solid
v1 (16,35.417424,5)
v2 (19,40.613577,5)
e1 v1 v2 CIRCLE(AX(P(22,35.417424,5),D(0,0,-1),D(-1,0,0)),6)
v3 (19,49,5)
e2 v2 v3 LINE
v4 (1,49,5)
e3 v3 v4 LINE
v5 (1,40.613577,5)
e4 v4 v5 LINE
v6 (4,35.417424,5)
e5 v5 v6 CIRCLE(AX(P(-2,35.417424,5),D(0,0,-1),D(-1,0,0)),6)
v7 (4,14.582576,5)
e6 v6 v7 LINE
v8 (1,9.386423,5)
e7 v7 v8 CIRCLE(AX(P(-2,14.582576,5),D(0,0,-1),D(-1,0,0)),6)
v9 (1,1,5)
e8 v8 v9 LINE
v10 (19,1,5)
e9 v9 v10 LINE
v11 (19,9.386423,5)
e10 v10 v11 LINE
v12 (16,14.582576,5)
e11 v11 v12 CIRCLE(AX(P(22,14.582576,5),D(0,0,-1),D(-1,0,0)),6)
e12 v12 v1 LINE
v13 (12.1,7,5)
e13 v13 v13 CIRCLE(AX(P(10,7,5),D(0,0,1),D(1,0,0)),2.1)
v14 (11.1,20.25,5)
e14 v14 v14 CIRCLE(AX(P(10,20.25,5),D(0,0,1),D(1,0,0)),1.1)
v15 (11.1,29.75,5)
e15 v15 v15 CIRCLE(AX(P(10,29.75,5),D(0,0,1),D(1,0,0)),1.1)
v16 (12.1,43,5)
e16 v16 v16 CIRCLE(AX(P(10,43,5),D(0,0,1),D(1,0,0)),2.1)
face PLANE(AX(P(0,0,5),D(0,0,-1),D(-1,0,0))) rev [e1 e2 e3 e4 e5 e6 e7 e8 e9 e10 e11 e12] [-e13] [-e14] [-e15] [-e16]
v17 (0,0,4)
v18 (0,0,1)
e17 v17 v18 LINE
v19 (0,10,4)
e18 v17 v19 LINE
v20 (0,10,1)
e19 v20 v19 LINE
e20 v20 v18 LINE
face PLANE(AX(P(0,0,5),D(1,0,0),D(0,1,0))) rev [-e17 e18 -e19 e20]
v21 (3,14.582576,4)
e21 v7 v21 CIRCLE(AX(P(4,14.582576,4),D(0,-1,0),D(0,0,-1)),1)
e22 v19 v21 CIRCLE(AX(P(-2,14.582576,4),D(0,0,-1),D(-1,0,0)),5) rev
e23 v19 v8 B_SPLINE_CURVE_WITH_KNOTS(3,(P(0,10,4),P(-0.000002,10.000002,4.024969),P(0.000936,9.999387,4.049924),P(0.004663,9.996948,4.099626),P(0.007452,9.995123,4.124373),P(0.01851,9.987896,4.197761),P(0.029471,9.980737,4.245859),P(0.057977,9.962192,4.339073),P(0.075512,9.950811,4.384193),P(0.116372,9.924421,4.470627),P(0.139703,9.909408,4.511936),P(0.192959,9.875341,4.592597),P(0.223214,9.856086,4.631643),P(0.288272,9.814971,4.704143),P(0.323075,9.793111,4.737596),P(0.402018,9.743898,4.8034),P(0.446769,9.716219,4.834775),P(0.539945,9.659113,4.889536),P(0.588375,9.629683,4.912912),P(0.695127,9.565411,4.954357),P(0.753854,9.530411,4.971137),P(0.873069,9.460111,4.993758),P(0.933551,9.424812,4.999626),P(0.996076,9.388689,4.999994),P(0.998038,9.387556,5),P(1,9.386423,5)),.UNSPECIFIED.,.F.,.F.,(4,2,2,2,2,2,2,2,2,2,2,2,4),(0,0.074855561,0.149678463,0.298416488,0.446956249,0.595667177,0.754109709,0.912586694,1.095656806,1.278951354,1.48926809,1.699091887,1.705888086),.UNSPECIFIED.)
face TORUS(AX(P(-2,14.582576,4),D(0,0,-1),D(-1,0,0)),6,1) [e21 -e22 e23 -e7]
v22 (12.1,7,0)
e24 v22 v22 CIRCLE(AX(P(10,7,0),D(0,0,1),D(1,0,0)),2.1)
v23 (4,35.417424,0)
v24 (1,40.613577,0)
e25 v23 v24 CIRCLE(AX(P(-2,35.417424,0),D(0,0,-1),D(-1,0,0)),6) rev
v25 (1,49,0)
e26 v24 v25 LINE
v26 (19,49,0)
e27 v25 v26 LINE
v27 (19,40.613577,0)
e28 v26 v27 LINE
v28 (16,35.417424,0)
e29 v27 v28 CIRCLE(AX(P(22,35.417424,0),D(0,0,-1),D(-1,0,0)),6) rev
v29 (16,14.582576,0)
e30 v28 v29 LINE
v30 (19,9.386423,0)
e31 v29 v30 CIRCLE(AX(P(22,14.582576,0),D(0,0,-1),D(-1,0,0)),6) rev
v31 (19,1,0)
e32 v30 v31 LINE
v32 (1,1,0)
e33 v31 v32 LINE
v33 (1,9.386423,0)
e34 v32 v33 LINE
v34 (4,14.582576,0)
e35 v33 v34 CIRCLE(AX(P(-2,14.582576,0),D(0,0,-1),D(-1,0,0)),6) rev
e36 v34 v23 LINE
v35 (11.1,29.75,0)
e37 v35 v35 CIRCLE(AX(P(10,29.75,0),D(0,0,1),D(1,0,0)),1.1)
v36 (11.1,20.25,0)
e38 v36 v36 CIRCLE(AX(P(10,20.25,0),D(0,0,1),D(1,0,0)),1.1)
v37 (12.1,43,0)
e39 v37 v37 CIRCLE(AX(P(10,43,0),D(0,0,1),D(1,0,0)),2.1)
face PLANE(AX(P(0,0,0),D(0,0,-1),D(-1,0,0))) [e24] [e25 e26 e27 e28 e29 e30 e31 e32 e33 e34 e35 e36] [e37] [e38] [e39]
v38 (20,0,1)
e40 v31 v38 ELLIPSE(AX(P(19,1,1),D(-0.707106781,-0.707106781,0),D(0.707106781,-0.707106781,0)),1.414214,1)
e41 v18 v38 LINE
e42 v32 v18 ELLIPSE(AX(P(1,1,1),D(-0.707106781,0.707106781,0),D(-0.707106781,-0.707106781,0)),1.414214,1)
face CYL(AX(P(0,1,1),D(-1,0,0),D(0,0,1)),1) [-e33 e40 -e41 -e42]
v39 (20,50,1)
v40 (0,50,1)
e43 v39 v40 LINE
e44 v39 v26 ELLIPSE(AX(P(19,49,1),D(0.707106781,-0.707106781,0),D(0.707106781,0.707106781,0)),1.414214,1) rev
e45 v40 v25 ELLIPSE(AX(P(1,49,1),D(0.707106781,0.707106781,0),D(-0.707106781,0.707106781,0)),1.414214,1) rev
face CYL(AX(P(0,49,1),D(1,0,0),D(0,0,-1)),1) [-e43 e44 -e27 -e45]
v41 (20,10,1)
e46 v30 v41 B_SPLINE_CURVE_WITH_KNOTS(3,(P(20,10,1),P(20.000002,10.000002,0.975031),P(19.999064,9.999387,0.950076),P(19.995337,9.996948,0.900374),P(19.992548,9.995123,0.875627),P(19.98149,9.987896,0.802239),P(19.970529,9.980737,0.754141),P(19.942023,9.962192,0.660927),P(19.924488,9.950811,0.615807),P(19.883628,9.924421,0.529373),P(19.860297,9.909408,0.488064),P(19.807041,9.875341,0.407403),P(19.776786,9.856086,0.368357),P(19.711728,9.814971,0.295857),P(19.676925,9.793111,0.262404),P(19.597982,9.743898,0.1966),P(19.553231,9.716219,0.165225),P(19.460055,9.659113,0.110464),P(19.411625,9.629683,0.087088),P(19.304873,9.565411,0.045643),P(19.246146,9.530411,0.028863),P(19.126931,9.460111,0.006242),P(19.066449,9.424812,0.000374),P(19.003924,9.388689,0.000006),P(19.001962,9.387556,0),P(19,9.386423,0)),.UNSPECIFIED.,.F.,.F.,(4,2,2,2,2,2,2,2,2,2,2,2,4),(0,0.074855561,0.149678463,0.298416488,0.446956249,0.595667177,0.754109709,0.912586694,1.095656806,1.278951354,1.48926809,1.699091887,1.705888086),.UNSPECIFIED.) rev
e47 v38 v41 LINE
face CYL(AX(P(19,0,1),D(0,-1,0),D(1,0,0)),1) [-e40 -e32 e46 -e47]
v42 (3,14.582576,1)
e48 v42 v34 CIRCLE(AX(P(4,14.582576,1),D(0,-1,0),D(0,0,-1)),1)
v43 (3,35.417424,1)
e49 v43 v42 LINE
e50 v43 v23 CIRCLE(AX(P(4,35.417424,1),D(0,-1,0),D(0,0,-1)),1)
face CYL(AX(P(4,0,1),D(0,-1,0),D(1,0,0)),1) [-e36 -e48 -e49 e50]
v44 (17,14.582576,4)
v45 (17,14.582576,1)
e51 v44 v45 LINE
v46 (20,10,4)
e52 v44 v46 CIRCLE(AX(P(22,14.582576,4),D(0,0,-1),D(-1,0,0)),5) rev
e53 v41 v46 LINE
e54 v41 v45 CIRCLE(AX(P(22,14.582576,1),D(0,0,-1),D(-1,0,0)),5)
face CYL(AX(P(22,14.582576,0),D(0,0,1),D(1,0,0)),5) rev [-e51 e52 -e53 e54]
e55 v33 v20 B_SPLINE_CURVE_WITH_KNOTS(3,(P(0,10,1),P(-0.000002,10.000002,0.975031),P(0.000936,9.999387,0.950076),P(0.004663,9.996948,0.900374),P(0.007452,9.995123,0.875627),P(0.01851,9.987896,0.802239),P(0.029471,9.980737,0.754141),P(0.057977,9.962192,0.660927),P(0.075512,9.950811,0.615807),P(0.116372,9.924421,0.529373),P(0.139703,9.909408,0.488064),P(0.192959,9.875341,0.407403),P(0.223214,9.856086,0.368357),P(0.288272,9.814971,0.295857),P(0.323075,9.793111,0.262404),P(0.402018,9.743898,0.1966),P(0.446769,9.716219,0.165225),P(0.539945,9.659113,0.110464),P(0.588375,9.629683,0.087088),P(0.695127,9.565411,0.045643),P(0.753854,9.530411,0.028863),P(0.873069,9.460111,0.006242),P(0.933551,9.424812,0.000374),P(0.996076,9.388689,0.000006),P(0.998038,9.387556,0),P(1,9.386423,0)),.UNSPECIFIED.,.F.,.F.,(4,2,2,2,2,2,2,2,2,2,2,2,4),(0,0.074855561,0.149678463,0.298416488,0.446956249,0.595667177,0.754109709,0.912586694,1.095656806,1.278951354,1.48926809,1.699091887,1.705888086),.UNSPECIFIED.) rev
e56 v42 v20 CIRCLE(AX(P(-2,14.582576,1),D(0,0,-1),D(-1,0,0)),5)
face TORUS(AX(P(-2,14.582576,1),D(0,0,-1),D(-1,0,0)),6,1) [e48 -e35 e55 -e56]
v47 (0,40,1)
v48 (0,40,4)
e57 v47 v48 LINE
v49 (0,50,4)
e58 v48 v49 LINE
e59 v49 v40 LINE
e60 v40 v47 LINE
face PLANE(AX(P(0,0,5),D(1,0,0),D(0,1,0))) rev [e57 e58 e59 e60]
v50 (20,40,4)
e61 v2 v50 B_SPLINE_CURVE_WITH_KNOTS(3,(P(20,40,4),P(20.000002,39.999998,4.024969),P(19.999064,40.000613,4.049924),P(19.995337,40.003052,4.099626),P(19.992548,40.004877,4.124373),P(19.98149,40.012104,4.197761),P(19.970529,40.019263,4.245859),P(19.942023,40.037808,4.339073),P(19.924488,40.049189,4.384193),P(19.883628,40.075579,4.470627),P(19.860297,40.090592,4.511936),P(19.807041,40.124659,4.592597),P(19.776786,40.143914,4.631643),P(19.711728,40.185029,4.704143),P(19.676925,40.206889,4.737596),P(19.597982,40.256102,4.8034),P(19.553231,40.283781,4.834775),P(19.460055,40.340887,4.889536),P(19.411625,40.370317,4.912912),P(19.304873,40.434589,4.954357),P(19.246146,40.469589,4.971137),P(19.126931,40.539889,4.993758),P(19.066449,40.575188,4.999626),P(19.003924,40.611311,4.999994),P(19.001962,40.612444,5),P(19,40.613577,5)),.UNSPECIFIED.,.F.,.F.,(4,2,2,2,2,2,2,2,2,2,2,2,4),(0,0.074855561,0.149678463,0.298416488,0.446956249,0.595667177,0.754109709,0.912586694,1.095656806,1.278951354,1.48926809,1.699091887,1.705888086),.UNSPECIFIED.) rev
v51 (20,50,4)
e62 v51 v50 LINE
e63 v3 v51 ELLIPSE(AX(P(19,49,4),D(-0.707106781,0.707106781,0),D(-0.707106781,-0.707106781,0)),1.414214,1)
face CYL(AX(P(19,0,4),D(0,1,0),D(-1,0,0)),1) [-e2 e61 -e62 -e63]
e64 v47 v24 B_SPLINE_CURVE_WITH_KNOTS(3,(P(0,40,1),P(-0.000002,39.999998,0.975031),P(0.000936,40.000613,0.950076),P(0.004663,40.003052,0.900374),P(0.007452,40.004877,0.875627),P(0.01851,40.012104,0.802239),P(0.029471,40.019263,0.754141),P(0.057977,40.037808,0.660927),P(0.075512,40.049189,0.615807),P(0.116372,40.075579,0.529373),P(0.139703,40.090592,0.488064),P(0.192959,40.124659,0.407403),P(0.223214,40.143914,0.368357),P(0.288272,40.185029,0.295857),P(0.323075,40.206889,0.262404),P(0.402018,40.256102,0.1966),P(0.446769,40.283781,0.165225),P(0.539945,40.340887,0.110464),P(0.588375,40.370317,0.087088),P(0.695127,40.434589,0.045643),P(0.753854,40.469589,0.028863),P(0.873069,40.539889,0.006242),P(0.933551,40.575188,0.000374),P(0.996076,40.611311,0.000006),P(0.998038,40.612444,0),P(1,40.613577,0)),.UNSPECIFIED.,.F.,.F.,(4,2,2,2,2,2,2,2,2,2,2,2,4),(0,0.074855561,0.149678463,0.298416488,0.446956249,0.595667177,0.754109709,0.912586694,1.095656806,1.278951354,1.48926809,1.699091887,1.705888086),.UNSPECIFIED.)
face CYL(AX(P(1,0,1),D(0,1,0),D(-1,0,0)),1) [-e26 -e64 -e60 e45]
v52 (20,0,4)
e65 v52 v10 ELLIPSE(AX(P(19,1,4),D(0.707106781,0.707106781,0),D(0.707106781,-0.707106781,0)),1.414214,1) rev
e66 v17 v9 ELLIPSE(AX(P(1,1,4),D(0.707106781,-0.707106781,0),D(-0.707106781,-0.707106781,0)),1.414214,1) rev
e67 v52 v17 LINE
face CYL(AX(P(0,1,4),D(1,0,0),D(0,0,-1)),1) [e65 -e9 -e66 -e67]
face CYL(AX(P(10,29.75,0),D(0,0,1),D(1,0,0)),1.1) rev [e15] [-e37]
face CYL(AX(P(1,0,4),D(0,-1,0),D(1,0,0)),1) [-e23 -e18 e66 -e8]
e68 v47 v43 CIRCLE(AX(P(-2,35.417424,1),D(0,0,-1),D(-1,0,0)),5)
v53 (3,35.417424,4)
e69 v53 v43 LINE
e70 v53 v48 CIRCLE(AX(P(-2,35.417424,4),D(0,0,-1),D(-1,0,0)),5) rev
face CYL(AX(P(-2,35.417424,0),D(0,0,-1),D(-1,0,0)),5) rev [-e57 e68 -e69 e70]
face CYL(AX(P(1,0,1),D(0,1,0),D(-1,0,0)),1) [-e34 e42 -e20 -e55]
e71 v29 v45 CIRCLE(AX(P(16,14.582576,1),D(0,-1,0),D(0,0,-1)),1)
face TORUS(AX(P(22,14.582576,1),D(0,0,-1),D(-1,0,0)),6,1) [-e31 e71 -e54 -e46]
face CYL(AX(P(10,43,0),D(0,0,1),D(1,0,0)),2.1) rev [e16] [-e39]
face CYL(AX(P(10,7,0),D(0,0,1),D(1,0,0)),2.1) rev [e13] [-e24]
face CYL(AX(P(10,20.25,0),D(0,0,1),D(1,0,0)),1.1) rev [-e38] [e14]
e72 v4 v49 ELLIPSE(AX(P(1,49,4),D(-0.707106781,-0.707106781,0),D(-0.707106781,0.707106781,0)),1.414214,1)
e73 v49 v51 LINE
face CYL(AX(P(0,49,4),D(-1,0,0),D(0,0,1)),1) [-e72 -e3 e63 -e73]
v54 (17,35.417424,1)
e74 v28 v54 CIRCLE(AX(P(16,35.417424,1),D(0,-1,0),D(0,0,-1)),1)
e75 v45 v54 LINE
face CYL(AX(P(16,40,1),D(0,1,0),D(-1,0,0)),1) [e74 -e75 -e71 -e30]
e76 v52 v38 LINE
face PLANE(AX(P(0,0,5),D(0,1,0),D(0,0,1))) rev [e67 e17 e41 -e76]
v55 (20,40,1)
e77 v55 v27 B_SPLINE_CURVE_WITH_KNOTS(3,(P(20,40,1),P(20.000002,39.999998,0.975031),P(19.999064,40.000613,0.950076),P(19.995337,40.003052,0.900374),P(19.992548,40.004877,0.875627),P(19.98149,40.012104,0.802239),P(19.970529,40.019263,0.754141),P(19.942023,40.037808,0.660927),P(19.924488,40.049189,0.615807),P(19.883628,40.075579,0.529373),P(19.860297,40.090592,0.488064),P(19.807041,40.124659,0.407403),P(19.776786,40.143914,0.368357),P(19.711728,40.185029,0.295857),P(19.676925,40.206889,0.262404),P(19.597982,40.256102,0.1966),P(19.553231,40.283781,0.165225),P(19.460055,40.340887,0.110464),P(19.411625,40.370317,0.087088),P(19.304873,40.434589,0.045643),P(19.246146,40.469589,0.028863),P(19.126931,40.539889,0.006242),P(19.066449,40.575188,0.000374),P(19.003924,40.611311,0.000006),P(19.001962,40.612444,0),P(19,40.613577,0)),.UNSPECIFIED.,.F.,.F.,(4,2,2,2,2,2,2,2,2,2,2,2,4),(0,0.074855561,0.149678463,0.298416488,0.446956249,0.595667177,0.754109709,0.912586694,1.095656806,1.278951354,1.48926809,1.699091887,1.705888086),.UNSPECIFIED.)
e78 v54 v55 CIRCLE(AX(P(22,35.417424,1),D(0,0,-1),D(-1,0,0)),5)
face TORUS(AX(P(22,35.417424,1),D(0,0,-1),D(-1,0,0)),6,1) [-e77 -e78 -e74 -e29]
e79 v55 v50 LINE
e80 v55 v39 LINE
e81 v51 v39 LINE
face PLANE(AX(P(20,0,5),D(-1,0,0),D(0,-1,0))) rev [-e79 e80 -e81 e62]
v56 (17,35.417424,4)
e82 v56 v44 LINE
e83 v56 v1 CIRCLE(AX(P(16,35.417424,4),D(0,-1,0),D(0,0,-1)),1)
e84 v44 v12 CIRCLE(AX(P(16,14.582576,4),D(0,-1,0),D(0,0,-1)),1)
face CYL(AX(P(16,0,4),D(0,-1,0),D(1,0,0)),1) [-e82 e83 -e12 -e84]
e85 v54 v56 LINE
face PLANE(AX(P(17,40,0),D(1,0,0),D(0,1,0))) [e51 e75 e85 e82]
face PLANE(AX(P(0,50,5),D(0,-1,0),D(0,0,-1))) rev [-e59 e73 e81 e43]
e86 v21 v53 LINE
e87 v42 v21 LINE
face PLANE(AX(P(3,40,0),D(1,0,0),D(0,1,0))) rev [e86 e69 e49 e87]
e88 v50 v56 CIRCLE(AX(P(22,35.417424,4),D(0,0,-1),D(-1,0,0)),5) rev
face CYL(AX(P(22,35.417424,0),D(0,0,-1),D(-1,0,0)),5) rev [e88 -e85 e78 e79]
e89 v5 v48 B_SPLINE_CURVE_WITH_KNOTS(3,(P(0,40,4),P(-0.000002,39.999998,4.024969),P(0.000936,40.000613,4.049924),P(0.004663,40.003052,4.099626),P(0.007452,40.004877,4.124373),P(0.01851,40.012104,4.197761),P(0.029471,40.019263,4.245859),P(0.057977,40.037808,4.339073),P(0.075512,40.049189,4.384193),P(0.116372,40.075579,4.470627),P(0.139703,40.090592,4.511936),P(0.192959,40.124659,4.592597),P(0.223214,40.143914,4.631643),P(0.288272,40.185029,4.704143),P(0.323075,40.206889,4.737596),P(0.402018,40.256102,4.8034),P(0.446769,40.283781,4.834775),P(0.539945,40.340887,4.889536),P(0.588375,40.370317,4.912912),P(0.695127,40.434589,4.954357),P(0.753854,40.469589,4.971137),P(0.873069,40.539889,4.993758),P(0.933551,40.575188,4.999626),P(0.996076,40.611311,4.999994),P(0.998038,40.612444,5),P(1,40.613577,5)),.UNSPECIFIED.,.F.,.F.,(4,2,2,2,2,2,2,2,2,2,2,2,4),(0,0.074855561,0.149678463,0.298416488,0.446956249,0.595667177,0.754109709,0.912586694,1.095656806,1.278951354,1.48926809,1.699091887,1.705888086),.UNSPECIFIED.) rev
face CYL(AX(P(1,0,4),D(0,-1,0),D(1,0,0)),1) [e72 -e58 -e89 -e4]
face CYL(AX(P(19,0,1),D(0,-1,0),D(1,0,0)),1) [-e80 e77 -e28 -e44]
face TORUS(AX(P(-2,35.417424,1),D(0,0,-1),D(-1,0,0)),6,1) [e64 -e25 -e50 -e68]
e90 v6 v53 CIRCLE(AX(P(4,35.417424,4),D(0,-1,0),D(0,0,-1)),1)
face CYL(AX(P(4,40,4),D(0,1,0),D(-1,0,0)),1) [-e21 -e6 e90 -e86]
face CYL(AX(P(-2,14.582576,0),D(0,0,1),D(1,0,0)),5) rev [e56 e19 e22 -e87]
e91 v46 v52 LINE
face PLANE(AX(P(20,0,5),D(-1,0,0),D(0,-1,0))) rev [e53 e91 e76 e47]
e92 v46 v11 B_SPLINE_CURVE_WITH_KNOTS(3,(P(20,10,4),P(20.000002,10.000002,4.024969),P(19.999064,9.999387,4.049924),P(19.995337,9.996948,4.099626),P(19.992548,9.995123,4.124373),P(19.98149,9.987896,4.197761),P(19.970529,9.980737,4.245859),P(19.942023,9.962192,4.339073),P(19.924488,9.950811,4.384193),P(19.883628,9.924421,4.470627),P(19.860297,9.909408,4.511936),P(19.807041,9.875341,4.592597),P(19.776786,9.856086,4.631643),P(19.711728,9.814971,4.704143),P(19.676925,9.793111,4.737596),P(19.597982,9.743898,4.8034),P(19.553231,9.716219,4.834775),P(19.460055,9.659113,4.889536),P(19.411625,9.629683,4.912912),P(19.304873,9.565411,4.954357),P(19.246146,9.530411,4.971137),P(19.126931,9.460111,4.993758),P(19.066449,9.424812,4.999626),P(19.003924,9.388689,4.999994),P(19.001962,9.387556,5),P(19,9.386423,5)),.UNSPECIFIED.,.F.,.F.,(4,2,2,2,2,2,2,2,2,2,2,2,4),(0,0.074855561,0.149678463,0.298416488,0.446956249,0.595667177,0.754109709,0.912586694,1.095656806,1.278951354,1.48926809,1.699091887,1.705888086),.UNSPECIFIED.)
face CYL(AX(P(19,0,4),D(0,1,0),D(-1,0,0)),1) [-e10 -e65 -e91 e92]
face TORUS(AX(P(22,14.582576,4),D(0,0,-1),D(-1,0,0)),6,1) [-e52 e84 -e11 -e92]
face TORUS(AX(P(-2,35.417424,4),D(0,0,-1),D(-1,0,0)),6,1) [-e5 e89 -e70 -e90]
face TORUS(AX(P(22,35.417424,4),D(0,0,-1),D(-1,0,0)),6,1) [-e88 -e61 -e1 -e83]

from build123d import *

# Parameters (mm, degrees)
SKETCH1_W            = 20
SKETCH1_H            = 50
BOSS_EXTRUDE1_DEPTH  = 5
SKETCH2_R            = 2.1
SKETCH2_R_2          = 1.1
CUT_EXTRUDE1_DEPTH   = 55.083269132
SKETCH3_W            = 3
SKETCH3_H            = 30
CUT_EXTRUDE2_DEPTH   = 55.083269132
FILLET1_R            = 5
FILLET1_OF_MIRROR1_R = 5
FILLET3_R            = 1


with BuildPart() as part:
    # Sketch1 → Boss-Extrude1 (new body)
    with BuildSketch(Plane.XY):
        with Locations((10, 25)):
            Rectangle(SKETCH1_W, SKETCH1_H)
    extrude(amount=BOSS_EXTRUDE1_DEPTH)

    # Sketch2 → Cut-Extrude1 (cut, through all)
    with BuildSketch(Plane.XY.offset(5)):
        with Locations((10, 43)):
            Circle(SKETCH2_R)
        with Locations((10, 7)):
            Circle(SKETCH2_R)
        with Locations((10, 29.75)):
            Circle(SKETCH2_R_2)
        with Locations((10, 20.25)):
            Circle(SKETCH2_R_2)
    extrude(amount=-CUT_EXTRUDE1_DEPTH, mode=Mode.SUBTRACT)

    # Sketch3 → Cut-Extrude2 (cut, through all)
    with BuildSketch(Plane.XY.offset(5)):
        with Locations((1.5, 25)):
            Rectangle(SKETCH3_W, SKETCH3_H)
    cut_extrude2 = extrude(amount=-CUT_EXTRUDE2_DEPTH, mode=Mode.SUBTRACT)

    # Fillet1
    # the kernel refuses this fillet: 5 mm, written as the material it adds along each edge
    with BuildSketch(Plane(origin=(3, 10, 5), x_dir=(-1, 0, 0), z_dir=(0, 0, -1))) as fillet1_piece_1:
        with BuildLine():
            CenterArc((5, 4.582575695), FILLET1_R, 180, 66.421821522)
            Line((0, 4.582575695), (-0.1, 4.582575695))
            Line((-0.1, 4.582575695), (-0.1, 0))
            Line((-0.1, 0), (0, -0.1))
            ThreePointArc((0, -0.1), (1.5, -0.1), (2.96, -0.091651514))
            Line((2.96, -0.091651514), (3, 0))
        make_face()
    extrude(amount=5)
    with BuildSketch(Plane(origin=(3, 40, 5), x_dir=(0, -1, 0), z_dir=(0, 0, -1))) as fillet1_piece_2:
        with BuildLine():
            CenterArc((4.582575695, 5), FILLET1_R, 203.578178478, 66.421821522)
            Line((0, 3), (-0.091651514, 2.96))
            ThreePointArc((-0.091651514, 2.96), (-0.1, 1.5), (-0.1, 0))
            Line((-0.1, 0), (0, -0.1))
            Line((0, -0.1), (4.582575695, -0.1))
            Line((4.582575695, -0.1), (4.582575695, 0))
        make_face()
    extrude(amount=5)

    # Mirror1: Cut-Extrude2 across plane
    add(cut_extrude2.mirror(Plane.ZY.offset(-10)), mode=Mode.SUBTRACT)

    # Fillet1 of Mirror1
    # the kernel refuses this fillet: 5 mm, written as the material it adds along each edge
    with BuildSketch(Plane(origin=(17, 10, 5), x_dir=(0, 1, 0), z_dir=(0, 0, -1))) as fillet1_of_mirror1_piece_1:
        with BuildLine():
            CenterArc((4.582575695, 5), FILLET1_OF_MIRROR1_R, 203.578178478, 66.421821522)
            Line((0, 3), (-0.091651514, 2.96))
            ThreePointArc((-0.091651514, 2.96), (-0.1, 1.5), (-0.1, 0))
            Line((-0.1, 0), (0, -0.1))
            Line((0, -0.1), (4.582575695, -0.1))
            Line((4.582575695, -0.1), (4.582575695, 0))
        make_face()
    extrude(amount=5)
    with BuildSketch(Plane(origin=(17, 40, 5), x_dir=(1, 0, 0), z_dir=(0, 0, -1))) as fillet1_of_mirror1_piece_2:
        with BuildLine():
            CenterArc((5, 4.582575695), FILLET1_OF_MIRROR1_R, 180, 66.421821522)
            Line((0, 4.582575695), (-0.1, 4.582575695))
            Line((-0.1, 4.582575695), (-0.1, 0))
            Line((-0.1, 0), (0, -0.1))
            ThreePointArc((0, -0.1), (1.5, -0.1), (2.96, -0.091651514))
            Line((2.96, -0.091651514), (3, 0))
        make_face()
    extrude(amount=5)

    # Fillet3
    fillet3_edges = [part.edges().sort_by_distance(p)[0] for p in [
        (20, 5, 5),
        (10, 50, 5),
        (0, 5, 0),
        (0, 5, 5),
        (0, 45, 5),
        (10, 50, 0),
        (3, 25, 5),
        (3, 25, 0),
        (20, 5, 0),
        (2.183300133, 11.843962907, 5),
        (2.183300133, 11.843962907, 0),
        (2.183300133, 38.156037093, 5),
        (2.183300133, 38.156037093, 0),
        (10, 0, 0),
        (0, 45, 0),
        (20, 45, 0),
        (20, 45, 5),
        (10, 0, 5),
        (17, 25, 5),
        (17, 25, 0),
        (17.816699867, 11.843962907, 5),
        (17.816699867, 11.843962907, 0),
        (17.816699867, 38.156037093, 5),
        (17.816699867, 38.156037093, 0),
    ]]
    fillet(fillet3_edges, radius=FILLET3_R)


solid = part.part
